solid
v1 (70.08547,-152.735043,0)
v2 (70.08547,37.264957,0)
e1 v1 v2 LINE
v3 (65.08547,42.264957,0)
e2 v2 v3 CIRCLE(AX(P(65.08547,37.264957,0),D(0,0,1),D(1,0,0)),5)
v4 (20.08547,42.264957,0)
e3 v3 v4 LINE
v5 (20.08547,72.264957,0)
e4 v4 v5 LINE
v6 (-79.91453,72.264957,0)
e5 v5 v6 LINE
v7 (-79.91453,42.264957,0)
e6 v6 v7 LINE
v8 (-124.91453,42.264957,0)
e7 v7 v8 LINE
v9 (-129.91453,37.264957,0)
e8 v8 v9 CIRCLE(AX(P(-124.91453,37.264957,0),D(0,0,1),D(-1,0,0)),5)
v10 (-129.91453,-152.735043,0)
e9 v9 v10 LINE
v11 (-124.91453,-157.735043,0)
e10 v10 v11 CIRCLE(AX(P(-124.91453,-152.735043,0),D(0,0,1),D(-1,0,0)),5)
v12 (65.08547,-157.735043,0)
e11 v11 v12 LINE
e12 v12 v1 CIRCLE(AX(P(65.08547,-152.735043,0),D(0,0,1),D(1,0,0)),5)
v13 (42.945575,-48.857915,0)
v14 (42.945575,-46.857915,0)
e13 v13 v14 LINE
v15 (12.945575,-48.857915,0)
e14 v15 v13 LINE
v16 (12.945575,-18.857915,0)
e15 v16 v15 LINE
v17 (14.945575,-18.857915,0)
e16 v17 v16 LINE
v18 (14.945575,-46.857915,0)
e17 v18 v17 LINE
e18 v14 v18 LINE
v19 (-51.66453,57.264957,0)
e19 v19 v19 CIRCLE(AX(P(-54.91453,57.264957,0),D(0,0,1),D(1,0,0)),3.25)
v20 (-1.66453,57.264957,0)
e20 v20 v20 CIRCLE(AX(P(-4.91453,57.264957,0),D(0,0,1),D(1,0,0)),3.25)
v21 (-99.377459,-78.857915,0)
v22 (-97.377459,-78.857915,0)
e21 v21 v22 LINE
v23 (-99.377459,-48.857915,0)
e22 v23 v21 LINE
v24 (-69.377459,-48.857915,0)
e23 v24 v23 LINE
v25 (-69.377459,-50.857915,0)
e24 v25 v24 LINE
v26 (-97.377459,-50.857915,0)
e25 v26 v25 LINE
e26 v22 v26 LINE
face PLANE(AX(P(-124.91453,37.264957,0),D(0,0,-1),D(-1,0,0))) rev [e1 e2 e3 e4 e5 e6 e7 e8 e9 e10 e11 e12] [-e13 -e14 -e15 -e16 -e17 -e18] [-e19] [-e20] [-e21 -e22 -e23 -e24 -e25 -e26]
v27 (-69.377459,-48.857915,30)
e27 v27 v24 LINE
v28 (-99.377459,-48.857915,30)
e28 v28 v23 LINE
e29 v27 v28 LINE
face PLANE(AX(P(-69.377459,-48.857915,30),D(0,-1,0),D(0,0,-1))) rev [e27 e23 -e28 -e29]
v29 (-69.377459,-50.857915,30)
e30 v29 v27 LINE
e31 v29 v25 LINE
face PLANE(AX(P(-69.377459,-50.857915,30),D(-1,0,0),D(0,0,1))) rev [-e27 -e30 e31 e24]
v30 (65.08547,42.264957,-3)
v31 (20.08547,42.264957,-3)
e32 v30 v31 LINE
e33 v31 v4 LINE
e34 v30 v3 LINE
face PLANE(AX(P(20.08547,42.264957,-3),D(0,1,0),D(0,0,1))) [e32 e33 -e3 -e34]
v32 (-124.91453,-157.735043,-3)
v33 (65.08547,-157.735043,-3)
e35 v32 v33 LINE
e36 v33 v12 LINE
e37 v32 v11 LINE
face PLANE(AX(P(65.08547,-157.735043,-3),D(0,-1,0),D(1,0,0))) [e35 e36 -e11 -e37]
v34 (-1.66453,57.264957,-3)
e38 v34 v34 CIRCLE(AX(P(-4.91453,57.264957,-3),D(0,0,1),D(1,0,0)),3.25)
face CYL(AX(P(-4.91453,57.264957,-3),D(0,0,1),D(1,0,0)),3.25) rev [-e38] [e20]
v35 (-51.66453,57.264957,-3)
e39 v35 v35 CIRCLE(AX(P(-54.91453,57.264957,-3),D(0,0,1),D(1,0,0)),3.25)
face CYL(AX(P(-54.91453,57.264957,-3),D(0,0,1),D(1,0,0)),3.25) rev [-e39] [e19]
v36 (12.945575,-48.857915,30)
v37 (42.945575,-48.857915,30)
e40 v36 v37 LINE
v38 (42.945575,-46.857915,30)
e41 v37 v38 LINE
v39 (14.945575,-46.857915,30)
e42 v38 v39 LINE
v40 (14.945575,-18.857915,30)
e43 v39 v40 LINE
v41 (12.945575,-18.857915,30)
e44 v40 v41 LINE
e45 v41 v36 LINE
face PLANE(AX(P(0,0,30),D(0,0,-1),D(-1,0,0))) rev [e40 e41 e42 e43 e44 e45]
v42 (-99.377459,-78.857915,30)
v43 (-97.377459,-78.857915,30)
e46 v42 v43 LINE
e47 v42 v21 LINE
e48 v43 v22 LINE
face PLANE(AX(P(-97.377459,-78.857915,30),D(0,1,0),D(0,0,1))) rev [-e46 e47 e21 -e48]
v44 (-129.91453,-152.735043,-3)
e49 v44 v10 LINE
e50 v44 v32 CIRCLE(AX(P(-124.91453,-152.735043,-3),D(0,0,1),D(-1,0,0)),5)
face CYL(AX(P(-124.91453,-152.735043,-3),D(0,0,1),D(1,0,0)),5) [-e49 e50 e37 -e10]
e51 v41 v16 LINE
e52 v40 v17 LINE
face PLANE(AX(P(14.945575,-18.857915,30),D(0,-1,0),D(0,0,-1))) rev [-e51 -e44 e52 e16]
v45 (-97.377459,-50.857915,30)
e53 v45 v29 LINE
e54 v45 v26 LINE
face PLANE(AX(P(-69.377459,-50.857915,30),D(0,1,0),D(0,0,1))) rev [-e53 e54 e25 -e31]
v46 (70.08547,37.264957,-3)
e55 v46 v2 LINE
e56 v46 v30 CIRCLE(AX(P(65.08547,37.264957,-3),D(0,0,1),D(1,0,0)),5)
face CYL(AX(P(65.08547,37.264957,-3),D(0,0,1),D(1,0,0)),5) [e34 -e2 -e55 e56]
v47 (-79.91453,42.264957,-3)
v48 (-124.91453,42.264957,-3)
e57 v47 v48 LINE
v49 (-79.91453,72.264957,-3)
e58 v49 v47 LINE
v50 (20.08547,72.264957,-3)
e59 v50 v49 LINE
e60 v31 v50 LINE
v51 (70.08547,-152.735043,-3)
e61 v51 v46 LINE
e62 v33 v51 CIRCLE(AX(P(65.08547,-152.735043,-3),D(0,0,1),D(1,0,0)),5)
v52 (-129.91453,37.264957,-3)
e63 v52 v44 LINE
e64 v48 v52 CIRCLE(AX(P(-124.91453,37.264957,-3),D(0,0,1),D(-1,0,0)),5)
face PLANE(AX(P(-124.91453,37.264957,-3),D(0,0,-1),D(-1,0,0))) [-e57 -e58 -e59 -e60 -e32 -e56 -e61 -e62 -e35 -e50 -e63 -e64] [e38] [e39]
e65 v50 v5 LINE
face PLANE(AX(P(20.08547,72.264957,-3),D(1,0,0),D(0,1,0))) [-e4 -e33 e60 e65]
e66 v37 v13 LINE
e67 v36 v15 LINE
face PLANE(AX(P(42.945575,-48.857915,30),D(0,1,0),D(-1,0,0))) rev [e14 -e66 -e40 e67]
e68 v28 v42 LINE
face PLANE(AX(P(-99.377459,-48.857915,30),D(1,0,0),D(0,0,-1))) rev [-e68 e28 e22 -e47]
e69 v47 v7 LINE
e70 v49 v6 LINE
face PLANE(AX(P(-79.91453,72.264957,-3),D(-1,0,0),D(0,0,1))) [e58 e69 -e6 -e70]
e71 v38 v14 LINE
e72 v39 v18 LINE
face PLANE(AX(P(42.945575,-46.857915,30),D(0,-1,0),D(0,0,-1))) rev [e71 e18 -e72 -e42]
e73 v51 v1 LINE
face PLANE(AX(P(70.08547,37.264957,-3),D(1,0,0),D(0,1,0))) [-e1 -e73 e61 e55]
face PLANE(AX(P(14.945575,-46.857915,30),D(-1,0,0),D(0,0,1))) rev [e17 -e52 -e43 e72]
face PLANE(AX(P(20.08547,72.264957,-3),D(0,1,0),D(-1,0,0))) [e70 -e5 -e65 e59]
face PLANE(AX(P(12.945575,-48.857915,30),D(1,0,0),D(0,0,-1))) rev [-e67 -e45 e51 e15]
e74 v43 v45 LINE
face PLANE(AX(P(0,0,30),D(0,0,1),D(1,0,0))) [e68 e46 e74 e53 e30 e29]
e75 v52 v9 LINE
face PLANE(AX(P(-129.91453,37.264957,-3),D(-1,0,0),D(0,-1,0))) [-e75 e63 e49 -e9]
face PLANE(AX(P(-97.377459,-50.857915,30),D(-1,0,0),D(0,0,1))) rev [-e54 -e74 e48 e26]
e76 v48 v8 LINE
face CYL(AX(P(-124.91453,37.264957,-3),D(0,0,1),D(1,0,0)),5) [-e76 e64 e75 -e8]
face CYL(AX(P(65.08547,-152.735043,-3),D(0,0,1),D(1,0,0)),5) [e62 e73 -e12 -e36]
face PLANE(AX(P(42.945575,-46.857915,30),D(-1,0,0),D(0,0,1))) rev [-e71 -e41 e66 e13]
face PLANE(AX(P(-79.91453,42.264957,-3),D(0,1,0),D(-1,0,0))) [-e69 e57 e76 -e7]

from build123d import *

# Parameters (mm, degrees)
SKETCH1_R           = 3.25
BASE_FLANGE1_DEPTH  = 3
BOSS_EXTRUDE1_DEPTH = 30


# Sheet-metal steps are written as plain solids
with BuildPart() as part:
    # Sketch1 → Base-Flange1 (new body)
    with BuildSketch(Plane.XY):
        with BuildLine():
            Line((-79.914529915, 72.264957265), (-79.914529915, 42.264957265))
            Line((-79.914529915, 42.264957265), (-124.914529915, 42.264957265))
            ThreePointArc((-124.914529915, 42.264957265), (-128.45006382, 40.800491171), (-129.914529915, 37.264957265))
            Line((-129.914529915, 37.264957265), (-129.914529915, -152.735042735))
            ThreePointArc((-129.914529915, -152.735042735), (-128.45006382, -156.270576641), (-124.914529915, -157.735042735))
            Line((-124.914529915, -157.735042735), (65.085470085, -157.735042735))
            ThreePointArc((65.085470085, -157.735042735), (68.621003991, -156.270576641), (70.085470085, -152.735042735))
            Line((70.085470085, -152.735042735), (70.085470085, 37.264957265))
            ThreePointArc((70.085470085, 37.264957265), (68.621003991, 40.800491171), (65.085470085, 42.264957265))
            Line((65.085470085, 42.264957265), (20.085470085, 42.264957265))
            Line((20.085470085, 42.264957265), (20.085470085, 72.264957265))
            Line((20.085470085, 72.264957265), (-79.914529915, 72.264957265))
        make_face()
        with Locations((-4.914529915, 57.264957265)):
            Circle(SKETCH1_R, mode=Mode.SUBTRACT)
        with Locations((-54.914529915, 57.264957265)):
            Circle(SKETCH1_R, mode=Mode.SUBTRACT)
    extrude(amount=-BASE_FLANGE1_DEPTH)

    # Sketch2 → Boss-Extrude1 (add)
    with BuildSketch(Plane.XY):
        Polygon((42.945575149, -48.857914887), (12.945575149, -48.857914887), (12.945575149, -18.857914887), (14.945575149, -18.857914887), (14.945575149, -46.857914887), (42.945575149, -46.857914887), align=None)
        Polygon((-69.377458811, -48.857914887), (-99.377458811, -48.857914887), (-99.377458811, -78.857914887), (-97.377458811, -78.857914887), (-97.377458811, -50.857914887), (-69.377458811, -50.857914887), align=None)
    extrude(amount=BOSS_EXTRUDE1_DEPTH)


solid = part.part
